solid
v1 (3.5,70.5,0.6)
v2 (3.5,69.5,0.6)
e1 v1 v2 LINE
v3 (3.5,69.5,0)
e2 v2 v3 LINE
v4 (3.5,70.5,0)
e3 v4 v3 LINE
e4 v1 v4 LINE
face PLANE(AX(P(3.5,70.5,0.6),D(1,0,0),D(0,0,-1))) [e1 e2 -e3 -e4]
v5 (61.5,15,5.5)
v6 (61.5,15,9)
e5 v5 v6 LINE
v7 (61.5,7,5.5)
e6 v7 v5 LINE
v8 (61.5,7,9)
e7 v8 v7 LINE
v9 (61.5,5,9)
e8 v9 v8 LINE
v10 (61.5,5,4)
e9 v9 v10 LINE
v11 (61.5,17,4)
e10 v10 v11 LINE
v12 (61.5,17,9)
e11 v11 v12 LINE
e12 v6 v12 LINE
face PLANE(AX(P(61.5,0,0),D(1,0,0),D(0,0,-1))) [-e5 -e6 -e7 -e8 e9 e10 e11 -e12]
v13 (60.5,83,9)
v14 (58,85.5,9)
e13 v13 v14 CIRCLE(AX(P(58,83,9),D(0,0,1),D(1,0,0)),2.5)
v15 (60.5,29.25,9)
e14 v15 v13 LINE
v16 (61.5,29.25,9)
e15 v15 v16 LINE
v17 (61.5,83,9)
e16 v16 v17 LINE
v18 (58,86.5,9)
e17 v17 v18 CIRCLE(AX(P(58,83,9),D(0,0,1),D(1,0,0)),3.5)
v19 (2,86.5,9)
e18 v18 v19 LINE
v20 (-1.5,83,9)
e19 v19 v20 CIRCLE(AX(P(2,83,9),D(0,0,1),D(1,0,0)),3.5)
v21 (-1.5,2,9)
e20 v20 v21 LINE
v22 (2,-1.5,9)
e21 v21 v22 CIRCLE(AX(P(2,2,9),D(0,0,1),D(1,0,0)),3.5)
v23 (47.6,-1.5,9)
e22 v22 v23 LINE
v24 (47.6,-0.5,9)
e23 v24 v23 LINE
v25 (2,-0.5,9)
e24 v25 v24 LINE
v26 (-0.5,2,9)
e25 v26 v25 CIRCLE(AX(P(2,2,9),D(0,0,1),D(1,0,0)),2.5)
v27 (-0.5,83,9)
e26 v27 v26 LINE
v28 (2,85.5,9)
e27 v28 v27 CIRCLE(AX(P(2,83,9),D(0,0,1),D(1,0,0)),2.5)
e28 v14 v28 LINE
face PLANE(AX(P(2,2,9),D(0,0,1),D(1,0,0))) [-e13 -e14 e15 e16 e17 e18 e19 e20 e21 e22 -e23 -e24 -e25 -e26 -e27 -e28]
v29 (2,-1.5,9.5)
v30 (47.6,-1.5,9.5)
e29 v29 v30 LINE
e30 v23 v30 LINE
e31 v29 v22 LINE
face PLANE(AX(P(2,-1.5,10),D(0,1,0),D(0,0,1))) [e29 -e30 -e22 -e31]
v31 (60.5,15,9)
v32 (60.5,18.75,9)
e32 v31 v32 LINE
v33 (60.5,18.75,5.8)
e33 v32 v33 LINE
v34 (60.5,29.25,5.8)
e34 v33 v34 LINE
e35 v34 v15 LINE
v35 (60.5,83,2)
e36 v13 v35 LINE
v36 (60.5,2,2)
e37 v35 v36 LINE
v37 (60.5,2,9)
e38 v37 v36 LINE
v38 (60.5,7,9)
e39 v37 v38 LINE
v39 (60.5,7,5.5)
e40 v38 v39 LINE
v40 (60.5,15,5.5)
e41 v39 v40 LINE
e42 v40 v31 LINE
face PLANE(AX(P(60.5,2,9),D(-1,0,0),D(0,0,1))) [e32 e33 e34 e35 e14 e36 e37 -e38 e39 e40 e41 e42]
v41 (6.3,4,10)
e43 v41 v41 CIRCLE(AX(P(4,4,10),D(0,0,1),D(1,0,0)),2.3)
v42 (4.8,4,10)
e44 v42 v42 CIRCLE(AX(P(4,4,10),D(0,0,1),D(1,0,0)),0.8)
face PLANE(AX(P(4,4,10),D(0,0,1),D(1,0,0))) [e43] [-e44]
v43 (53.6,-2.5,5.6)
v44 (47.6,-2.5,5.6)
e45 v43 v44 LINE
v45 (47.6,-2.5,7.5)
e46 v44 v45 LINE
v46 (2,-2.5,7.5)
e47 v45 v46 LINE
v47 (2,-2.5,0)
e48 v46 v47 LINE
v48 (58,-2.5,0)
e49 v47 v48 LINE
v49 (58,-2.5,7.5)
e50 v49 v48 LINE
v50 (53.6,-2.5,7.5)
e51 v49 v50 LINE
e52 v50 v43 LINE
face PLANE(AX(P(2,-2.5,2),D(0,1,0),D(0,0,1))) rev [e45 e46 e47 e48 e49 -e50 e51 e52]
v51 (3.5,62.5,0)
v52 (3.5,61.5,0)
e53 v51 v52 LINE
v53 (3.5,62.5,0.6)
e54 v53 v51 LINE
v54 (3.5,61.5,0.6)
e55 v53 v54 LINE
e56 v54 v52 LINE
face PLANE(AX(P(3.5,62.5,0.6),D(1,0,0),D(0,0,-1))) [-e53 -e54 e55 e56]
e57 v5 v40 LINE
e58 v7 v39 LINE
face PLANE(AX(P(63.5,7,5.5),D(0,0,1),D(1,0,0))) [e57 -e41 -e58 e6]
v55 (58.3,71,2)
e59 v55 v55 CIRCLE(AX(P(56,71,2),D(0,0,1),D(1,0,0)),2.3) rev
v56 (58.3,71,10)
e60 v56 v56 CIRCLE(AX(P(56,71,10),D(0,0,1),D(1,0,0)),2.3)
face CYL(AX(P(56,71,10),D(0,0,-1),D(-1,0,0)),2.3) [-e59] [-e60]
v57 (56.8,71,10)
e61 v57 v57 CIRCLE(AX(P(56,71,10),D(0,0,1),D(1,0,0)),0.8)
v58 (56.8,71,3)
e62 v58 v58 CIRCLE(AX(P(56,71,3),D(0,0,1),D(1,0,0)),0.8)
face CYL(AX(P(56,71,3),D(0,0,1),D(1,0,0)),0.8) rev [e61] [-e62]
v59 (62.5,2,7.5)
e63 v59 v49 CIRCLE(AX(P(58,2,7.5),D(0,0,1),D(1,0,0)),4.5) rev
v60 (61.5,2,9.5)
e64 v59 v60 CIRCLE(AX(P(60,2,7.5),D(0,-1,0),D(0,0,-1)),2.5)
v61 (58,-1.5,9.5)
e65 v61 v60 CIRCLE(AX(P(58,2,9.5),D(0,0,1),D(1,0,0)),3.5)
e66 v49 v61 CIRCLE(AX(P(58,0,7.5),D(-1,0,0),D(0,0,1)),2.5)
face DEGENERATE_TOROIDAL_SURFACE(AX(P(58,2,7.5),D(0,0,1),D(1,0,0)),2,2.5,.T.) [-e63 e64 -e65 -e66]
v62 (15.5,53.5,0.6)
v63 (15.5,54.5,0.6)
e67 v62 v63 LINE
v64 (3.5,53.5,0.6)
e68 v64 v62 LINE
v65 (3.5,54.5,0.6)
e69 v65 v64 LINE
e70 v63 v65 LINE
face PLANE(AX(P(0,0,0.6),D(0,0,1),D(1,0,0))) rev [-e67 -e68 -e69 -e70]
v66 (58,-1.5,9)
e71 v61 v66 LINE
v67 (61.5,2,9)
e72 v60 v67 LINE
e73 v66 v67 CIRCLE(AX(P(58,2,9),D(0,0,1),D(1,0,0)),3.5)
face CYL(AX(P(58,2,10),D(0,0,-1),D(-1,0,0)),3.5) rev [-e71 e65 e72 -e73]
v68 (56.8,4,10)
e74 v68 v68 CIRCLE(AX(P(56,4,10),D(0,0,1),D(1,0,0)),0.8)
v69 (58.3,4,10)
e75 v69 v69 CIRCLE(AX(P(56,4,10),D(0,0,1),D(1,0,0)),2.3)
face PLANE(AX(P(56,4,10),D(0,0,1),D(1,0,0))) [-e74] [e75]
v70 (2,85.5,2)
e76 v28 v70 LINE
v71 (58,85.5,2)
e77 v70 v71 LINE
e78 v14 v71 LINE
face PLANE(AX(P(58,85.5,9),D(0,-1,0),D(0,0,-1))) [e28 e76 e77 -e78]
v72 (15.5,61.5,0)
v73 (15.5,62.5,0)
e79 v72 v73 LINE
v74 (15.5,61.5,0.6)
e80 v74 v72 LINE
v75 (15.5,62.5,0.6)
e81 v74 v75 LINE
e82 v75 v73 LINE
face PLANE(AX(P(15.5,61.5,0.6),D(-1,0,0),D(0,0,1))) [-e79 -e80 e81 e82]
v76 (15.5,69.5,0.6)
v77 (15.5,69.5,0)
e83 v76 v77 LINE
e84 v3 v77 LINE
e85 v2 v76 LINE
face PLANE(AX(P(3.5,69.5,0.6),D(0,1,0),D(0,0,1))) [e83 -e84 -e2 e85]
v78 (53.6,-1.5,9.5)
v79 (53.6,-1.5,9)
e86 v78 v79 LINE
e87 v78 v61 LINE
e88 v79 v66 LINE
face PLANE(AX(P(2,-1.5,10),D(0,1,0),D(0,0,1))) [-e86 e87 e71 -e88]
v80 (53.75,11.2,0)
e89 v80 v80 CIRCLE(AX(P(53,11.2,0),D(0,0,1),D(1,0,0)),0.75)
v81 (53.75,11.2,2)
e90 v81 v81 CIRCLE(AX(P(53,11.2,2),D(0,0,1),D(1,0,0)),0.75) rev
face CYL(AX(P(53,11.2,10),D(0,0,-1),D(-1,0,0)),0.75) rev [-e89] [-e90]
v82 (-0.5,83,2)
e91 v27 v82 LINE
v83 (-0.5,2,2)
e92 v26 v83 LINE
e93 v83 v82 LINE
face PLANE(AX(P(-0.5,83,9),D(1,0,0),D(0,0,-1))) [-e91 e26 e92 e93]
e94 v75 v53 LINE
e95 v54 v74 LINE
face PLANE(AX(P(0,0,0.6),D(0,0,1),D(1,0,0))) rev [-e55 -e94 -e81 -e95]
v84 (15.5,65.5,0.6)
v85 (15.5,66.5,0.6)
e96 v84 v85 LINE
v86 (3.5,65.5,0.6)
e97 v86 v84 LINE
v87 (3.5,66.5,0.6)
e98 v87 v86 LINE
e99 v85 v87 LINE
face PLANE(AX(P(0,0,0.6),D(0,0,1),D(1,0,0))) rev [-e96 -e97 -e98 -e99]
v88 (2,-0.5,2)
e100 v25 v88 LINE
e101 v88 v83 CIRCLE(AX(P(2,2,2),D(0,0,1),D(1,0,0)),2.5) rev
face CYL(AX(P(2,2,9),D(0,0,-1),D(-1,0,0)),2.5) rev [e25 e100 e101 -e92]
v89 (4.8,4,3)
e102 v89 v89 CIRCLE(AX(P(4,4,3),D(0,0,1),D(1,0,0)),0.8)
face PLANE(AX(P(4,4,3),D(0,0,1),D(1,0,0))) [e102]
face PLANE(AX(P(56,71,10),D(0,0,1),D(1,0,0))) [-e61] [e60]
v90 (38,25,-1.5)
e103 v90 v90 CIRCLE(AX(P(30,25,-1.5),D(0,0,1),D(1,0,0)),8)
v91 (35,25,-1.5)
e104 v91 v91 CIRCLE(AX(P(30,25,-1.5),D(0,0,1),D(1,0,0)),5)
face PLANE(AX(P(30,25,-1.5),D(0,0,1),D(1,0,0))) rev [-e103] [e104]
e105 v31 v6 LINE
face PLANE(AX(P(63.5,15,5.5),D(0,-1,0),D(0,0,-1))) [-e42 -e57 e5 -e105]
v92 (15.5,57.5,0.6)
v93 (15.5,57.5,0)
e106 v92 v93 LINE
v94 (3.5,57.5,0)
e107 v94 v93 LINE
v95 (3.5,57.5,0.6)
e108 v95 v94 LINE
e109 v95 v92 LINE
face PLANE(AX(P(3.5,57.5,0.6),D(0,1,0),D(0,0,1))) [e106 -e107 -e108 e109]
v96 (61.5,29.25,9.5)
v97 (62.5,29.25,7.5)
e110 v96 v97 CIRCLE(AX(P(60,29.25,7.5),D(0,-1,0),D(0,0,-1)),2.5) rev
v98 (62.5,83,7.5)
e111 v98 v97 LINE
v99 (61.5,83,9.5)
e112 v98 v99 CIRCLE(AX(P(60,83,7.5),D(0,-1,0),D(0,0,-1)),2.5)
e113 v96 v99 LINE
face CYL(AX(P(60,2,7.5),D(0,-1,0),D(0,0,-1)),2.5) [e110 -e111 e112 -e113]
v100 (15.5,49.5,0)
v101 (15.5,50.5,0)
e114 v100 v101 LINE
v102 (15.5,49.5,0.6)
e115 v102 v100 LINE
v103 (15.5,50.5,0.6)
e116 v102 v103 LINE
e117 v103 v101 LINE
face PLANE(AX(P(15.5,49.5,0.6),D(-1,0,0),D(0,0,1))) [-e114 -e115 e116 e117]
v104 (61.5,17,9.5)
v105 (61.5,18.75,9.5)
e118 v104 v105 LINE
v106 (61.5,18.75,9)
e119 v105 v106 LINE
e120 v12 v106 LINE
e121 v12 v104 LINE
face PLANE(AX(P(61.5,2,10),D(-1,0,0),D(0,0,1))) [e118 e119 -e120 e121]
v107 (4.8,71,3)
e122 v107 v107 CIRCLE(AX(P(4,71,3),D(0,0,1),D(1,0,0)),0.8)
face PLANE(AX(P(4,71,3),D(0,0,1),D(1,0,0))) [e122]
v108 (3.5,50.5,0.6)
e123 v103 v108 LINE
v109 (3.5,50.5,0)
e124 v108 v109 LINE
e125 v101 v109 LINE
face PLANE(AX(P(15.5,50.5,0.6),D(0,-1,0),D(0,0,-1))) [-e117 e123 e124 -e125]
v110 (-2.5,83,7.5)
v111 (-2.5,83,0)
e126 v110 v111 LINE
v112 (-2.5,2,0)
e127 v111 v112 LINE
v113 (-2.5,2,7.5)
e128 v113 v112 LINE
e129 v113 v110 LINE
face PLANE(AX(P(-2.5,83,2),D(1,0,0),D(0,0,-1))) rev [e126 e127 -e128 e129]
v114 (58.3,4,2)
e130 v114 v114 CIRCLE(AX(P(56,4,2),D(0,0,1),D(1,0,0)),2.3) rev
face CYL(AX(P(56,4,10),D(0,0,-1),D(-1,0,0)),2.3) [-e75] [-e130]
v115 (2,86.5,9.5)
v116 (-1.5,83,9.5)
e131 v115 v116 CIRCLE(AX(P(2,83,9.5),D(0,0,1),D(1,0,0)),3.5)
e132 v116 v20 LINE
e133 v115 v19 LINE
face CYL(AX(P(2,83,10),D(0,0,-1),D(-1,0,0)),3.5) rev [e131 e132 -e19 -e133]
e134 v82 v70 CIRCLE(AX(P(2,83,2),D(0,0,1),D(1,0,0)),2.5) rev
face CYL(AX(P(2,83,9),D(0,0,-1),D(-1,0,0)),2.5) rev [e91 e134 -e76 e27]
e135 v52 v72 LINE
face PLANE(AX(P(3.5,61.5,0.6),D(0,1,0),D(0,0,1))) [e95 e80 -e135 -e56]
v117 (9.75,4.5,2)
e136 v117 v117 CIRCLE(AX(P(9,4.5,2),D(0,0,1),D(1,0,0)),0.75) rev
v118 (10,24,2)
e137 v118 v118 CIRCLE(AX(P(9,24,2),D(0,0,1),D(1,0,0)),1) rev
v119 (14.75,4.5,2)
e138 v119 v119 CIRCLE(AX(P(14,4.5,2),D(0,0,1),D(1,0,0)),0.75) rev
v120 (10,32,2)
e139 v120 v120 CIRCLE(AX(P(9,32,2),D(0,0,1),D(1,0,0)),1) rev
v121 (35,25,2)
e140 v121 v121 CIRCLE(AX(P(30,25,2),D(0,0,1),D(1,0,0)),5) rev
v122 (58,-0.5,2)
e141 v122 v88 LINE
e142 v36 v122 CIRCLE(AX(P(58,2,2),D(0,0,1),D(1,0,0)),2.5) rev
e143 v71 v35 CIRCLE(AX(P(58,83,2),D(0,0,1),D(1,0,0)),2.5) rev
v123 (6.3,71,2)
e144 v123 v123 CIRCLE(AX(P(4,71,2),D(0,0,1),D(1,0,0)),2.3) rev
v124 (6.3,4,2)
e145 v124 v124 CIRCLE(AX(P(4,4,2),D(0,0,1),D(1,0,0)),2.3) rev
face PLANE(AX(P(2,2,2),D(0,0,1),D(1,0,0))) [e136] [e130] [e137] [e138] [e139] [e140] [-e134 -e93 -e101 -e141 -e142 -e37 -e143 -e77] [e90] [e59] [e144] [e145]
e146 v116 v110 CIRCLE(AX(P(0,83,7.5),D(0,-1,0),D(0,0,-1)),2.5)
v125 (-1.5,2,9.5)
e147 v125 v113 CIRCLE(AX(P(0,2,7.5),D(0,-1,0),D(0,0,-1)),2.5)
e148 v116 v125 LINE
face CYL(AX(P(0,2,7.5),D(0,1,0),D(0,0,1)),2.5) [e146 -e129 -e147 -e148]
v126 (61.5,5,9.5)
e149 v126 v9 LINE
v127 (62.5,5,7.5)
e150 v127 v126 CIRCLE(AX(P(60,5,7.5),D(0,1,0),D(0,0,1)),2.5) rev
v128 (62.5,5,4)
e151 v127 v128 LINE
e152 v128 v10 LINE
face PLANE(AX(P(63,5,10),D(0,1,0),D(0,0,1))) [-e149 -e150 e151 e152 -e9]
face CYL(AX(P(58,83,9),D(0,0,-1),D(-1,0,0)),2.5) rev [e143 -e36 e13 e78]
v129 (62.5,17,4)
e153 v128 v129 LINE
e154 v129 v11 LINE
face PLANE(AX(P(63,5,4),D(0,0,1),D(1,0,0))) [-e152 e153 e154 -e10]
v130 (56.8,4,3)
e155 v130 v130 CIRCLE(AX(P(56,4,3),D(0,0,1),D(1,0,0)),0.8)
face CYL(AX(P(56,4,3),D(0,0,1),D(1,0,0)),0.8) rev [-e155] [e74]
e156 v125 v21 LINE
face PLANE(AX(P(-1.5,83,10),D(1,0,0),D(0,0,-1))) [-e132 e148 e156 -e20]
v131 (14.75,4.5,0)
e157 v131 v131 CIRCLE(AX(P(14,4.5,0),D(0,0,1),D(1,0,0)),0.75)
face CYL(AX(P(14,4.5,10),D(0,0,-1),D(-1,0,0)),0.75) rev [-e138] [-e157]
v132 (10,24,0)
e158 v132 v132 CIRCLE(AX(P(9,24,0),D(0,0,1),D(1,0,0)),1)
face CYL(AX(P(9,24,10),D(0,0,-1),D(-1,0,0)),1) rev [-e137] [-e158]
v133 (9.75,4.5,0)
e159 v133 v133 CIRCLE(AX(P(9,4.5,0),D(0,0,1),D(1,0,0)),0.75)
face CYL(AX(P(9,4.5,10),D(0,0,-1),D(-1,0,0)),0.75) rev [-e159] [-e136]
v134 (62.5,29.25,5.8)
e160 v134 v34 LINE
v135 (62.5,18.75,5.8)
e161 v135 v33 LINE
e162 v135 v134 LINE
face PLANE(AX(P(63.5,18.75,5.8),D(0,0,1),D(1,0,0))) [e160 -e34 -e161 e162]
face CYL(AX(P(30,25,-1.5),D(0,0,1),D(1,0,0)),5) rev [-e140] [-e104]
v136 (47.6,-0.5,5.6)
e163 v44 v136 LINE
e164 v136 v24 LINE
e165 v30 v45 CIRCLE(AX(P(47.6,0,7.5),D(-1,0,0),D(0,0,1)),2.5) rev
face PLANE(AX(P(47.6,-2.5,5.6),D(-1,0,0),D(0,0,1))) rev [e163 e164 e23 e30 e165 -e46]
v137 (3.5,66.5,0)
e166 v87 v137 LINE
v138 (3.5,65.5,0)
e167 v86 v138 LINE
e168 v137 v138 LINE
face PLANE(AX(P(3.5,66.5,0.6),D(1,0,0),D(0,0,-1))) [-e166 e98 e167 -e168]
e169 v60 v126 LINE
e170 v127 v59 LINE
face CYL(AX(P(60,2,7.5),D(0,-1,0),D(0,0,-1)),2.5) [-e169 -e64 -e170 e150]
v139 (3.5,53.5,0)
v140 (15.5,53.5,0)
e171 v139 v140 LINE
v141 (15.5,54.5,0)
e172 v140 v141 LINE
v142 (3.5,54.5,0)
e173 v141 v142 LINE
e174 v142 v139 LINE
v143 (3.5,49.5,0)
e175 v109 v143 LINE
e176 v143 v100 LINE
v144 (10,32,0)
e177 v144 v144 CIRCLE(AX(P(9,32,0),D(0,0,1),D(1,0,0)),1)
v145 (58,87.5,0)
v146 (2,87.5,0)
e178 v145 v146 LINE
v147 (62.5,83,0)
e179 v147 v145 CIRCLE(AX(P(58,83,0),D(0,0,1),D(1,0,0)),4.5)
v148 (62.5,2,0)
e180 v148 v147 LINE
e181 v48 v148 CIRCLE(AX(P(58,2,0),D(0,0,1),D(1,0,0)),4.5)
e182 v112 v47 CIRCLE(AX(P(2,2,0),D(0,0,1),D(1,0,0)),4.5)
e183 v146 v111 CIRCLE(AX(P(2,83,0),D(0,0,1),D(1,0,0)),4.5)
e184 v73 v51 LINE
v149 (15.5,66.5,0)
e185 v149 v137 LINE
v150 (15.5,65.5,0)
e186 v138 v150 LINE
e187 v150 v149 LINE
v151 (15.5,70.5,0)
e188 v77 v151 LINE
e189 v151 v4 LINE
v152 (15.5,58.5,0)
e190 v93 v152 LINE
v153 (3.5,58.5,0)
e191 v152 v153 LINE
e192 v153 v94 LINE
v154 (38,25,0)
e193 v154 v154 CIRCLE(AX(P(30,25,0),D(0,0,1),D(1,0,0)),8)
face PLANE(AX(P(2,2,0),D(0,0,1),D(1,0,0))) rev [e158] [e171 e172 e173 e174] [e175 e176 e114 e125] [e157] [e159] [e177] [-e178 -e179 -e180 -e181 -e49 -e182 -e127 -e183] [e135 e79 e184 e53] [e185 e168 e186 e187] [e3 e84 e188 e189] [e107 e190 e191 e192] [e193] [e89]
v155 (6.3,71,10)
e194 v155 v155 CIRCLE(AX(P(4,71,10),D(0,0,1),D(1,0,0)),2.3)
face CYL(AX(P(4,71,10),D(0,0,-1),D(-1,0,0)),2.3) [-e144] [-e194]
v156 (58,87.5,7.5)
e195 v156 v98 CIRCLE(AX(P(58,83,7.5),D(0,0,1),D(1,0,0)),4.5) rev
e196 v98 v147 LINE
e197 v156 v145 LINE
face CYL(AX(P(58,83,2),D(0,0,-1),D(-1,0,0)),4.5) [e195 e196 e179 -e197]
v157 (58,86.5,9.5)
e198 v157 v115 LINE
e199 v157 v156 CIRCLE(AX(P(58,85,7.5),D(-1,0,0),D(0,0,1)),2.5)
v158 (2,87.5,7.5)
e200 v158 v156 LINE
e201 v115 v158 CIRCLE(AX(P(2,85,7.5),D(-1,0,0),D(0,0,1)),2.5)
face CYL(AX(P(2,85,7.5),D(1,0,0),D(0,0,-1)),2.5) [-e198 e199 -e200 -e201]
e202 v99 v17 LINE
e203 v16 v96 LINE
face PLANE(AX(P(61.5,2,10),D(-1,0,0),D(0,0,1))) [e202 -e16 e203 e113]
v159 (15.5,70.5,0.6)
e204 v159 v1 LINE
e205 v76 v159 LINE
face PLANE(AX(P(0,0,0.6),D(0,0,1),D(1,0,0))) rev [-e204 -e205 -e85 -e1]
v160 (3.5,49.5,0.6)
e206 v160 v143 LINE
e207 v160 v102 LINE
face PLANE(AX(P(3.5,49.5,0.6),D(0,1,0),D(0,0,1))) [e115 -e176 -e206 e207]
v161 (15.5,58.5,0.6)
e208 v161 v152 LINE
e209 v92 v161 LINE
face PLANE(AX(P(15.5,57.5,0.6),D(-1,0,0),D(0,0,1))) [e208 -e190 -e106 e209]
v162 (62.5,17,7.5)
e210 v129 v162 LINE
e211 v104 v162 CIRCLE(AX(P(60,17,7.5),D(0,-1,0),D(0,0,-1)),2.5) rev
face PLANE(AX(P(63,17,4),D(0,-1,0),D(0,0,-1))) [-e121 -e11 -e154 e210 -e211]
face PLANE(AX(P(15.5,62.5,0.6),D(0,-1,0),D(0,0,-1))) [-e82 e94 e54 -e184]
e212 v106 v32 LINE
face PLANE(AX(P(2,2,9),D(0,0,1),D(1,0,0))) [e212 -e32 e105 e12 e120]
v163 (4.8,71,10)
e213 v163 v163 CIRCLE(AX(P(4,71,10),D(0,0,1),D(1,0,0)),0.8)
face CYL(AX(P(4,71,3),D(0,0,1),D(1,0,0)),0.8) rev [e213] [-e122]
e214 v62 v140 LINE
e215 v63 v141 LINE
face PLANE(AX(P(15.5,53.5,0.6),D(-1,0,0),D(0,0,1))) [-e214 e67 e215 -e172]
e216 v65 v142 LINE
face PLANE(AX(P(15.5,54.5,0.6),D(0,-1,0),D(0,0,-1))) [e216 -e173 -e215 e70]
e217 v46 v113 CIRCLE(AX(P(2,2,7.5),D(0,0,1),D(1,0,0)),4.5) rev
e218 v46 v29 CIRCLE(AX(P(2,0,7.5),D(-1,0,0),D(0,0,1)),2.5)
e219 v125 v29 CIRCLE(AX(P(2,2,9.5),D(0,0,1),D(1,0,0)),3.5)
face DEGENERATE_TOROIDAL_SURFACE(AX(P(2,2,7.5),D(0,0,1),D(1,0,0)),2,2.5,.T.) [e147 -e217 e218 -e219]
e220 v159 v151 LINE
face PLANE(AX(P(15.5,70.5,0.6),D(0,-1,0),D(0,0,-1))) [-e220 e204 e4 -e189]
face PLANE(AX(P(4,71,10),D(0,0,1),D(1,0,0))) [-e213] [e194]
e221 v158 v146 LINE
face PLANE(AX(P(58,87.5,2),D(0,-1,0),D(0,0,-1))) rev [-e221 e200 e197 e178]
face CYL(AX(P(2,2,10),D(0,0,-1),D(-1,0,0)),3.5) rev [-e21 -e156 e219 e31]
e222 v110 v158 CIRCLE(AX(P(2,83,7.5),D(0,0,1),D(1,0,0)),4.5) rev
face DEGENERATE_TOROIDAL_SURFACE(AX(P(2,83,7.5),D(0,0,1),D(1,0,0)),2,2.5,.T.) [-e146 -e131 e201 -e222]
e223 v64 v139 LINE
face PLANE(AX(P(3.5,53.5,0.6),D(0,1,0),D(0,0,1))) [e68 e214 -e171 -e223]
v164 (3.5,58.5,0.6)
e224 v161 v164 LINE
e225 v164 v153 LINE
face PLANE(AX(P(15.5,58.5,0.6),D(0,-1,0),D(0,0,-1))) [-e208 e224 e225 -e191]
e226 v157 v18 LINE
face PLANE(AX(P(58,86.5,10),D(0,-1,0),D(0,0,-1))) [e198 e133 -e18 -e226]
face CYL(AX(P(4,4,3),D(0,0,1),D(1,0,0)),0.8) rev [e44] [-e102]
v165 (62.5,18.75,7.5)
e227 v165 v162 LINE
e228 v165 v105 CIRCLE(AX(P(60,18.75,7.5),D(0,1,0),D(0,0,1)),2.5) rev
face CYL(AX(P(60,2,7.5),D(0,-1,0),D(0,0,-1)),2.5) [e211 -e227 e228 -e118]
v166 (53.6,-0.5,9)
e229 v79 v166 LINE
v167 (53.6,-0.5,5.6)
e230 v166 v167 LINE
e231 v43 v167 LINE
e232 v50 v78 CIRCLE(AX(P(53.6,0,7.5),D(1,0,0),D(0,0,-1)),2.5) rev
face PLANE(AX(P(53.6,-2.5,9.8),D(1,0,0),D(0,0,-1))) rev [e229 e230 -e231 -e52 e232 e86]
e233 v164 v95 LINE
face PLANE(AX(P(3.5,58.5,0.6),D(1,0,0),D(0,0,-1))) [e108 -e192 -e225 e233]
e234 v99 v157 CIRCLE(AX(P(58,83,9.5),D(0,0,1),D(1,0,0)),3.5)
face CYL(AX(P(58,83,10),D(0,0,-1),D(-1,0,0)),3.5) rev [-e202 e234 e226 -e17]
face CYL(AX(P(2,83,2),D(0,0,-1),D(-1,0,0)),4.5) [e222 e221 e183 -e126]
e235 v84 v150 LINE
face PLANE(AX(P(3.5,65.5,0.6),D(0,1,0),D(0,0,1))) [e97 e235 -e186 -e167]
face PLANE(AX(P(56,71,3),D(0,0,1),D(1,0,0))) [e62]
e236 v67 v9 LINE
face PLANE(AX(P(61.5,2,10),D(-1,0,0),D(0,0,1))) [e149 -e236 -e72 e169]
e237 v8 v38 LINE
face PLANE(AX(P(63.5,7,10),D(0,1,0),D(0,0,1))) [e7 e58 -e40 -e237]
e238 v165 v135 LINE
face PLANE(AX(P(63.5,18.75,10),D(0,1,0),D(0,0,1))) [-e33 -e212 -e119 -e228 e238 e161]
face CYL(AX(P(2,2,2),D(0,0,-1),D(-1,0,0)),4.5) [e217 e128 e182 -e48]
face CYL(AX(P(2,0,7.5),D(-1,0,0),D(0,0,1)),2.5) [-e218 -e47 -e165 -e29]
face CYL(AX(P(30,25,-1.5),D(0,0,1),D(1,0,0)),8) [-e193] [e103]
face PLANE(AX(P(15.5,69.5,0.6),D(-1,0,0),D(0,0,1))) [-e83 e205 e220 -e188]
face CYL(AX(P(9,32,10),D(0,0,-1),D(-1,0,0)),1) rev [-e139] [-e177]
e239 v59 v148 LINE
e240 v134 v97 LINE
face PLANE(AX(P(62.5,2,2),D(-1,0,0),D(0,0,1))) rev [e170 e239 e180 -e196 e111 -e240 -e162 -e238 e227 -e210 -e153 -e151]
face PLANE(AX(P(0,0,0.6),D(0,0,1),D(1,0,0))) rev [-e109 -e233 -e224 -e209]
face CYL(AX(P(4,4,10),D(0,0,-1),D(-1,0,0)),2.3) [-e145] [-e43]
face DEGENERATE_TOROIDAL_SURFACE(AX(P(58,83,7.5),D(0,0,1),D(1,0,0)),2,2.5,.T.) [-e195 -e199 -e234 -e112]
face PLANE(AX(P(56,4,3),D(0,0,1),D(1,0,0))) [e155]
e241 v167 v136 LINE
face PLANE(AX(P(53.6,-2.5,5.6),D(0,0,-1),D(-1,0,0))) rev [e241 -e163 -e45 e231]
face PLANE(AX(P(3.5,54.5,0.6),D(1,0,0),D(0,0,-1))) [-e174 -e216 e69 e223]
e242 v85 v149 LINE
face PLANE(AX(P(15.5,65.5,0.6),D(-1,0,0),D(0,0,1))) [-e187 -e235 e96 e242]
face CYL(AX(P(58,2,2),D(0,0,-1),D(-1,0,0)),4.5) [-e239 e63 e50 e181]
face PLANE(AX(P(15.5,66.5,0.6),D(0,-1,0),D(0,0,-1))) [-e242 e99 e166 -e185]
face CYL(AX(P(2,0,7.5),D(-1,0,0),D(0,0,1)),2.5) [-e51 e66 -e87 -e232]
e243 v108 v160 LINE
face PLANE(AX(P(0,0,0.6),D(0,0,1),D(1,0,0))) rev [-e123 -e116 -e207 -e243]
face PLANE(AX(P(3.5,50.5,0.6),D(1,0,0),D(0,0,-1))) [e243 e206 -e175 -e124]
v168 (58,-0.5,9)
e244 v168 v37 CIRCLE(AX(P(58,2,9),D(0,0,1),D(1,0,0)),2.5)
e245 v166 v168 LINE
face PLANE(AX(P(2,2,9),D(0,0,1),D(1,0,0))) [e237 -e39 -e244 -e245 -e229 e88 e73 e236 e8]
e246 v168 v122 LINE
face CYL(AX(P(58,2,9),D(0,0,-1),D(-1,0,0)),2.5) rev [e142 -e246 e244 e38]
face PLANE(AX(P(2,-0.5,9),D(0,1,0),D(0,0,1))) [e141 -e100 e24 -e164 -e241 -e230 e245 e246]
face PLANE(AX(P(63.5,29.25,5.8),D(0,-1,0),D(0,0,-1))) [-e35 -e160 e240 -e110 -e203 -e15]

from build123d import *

# Parameters (mm, degrees)
TOP_PLATE_DEPTH                = 2
WALL_OUTER_HALF_DEPTH          = 10
WALL_INNER_HALF_DEPTH          = 9
LENS_FACE_ROUND_OVER_R         = 2.5
SKETCH_4_R                     = 8
SKETCH_4_R_2                   = 5
LENS_BEZEL_RING_DEPTH          = 1.5
SKETCH_5_R                     = 2.3
CORNER_POSTS_DEPTH             = 10
POST_START                     = 10
SKETCH_6_R                     = 0.8
POST_PILOT_HOLES_M2_DEPTH      = 7
SKETCH_7_W                     = 12
SKETCH_7_H                     = 1
GRIP_GROOVES_DEPTH             = 0.6
SKETCH_8_R                     = 1
BOOT_RESET_PINHOLES_DEPTH      = 108.993055471
SKETCH_9_W                     = 6
SKETCH_9_H                     = 4.2
SHUTTER_WINDOW_DEPTH           = 108.993055471
SKETCH_10_R                    = 5
LENS_HOLE_DEPTH                = 108.993055471
SKETCH_11_R                    = 0.75
LED_LIGHT_HOLES_D1_D4_D5_DEPTH = 108.993055471
USB_C_START                    = 59
SKETCH_12_W                    = 4.2
SKETCH_12_H                    = 10.5
USB_C_WINDOW_DEPTH             = 4.5
POWER_START                    = 59
SKETCH_13_W                    = 4.5
SKETCH_13_H                    = 8
POWER_SWITCH_SLOT_DEPTH        = 4.5
SWITCH_START                   = 61.5
SKETCH_14_W                    = 6
SKETCH_14_H                    = 12
SWITCH_FINGER_POCKET_DEPTH     = 1.5


with BuildPart() as part:
    # 草圖1 → top plate (new body)
    with BuildSketch(Plane.XY):
        with BuildLine():
            Line((2, -2.5), (58, -2.5))
            ThreePointArc((58, -2.5), (61.181980515, -1.181980515), (62.5, 2))
            Line((62.5, 2), (62.5, 83))
            ThreePointArc((62.5, 83), (61.181980515, 86.181980515), (58, 87.5))
            Line((58, 87.5), (2, 87.5))
            ThreePointArc((2, 87.5), (-1.181980515, 86.181980515), (-2.5, 83))
            Line((-2.5, 83), (-2.5, 2))
            ThreePointArc((-2.5, 2), (-1.181980515, -1.181980515), (2, -2.5))
        make_face()
    extrude(amount=TOP_PLATE_DEPTH)

    # 草圖2 → wall outer half (add)
    with BuildSketch(Plane.XY):
        with BuildLine():
            Line((2, -2.5), (58, -2.5))
            ThreePointArc((58, -2.5), (61.181980515, -1.181980515), (62.5, 2))
            Line((62.5, 2), (62.5, 83))
            ThreePointArc((62.5, 83), (61.181980515, 86.181980515), (58, 87.5))
            Line((58, 87.5), (2, 87.5))
            ThreePointArc((2, 87.5), (-1.181980515, 86.181980515), (-2.5, 83))
            Line((-2.5, 83), (-2.5, 2))
            ThreePointArc((-2.5, 2), (-1.181980515, -1.181980515), (2, -2.5))
        make_face()
        with BuildLine():
            Line((2, -1.5), (58, -1.5))
            ThreePointArc((58, -1.5), (60.474873734, -0.474873734), (61.5, 2))
            Line((61.5, 2), (61.5, 83))
            ThreePointArc((61.5, 83), (60.474873734, 85.474873734), (58, 86.5))
            Line((58, 86.5), (2, 86.5))
            ThreePointArc((2, 86.5), (-0.474873734, 85.474873734), (-1.5, 83))
            Line((-1.5, 83), (-1.5, 2))
            ThreePointArc((-1.5, 2), (-0.474873734, -0.474873734), (2, -1.5))
        make_face(mode=Mode.SUBTRACT)
    extrude(amount=WALL_OUTER_HALF_DEPTH)

    # 草圖3 → wall inner half (add)
    with BuildSketch(Plane.XY):
        with BuildLine():
            Line((2, -1.5), (58, -1.5))
            ThreePointArc((58, -1.5), (60.474873734, -0.474873734), (61.5, 2))
            Line((61.5, 2), (61.5, 83))
            ThreePointArc((61.5, 83), (60.474873734, 85.474873734), (58, 86.5))
            Line((58, 86.5), (2, 86.5))
            ThreePointArc((2, 86.5), (-0.474873734, 85.474873734), (-1.5, 83))
            Line((-1.5, 83), (-1.5, 2))
            ThreePointArc((-1.5, 2), (-0.474873734, -0.474873734), (2, -1.5))
        make_face()
        with BuildLine():
            Line((2, -0.5), (58, -0.5))
            ThreePointArc((58, -0.5), (59.767766953, 0.232233047), (60.5, 2))
            Line((60.5, 2), (60.5, 83))
            ThreePointArc((60.5, 83), (59.767766953, 84.767766953), (58, 85.5))
            Line((58, 85.5), (2, 85.5))
            ThreePointArc((2, 85.5), (0.232233047, 84.767766953), (-0.5, 83))
            Line((-0.5, 83), (-0.5, 2))
            ThreePointArc((-0.5, 2), (0.232233047, 0.232233047), (2, -0.5))
        make_face(mode=Mode.SUBTRACT)
    extrude(amount=WALL_INNER_HALF_DEPTH)

    # lens face round-over
    # the kernel refuses this fillet: 2.5 mm, written as the material it takes off along each edge
    with BuildSketch(Plane(origin=(2, 2, 10), x_dir=(-1, 0, 0), z_dir=(0, 1, 0))) as lens_face_round_over_piece_1:
        with BuildLine():
            CenterArc((4.5 - LENS_FACE_ROUND_OVER_R, -LENS_FACE_ROUND_OVER_R), LENS_FACE_ROUND_OVER_R, 0, 90)
            Line((4.5 - LENS_FACE_ROUND_OVER_R, 0), (4.5, 0))
            Line((4.5, 0), (4.5, -LENS_FACE_ROUND_OVER_R))
        make_face()
    revolve(axis=Axis((2, 2, 10), (0, 0, 1)), revolution_arc=90, mode=Mode.SUBTRACT)
    with BuildSketch(Plane(origin=(-2.5, 83, 10), x_dir=(1, 0, 0), z_dir=(0, -1, 0)), Plane(origin=(62.5, 2, 10), x_dir=(-1, 0, 0), z_dir=(0, 1, 0))) as lens_face_round_over_piece_2:
        with BuildLine():
            CenterArc((LENS_FACE_ROUND_OVER_R, -LENS_FACE_ROUND_OVER_R), LENS_FACE_ROUND_OVER_R, 90, 90)
            Line((0, -LENS_FACE_ROUND_OVER_R), (0, 0))
            Line((0, 0), (LENS_FACE_ROUND_OVER_R, 0))
        make_face()
    extrude(amount=81, mode=Mode.SUBTRACT)
    with BuildSketch(Plane(origin=(2, 83, 10), x_dir=(0, 1, 0), z_dir=(1, 0, 0))) as lens_face_round_over_piece_3:
        with BuildLine():
            CenterArc((4.5 - LENS_FACE_ROUND_OVER_R, -LENS_FACE_ROUND_OVER_R), LENS_FACE_ROUND_OVER_R, 0, 90)
            Line((4.5, -LENS_FACE_ROUND_OVER_R), (4.5, 0))
            Line((4.5, 0), (4.5 - LENS_FACE_ROUND_OVER_R, 0))
        make_face()
    revolve(axis=Axis((2, 83, 10), (0, 0, 1)), revolution_arc=90, mode=Mode.SUBTRACT)
    with BuildSketch(Plane(origin=(58, 87.5, 10), x_dir=(0, -1, 0), z_dir=(-1, 0, 0))) as lens_face_round_over_piece_4:
        with BuildLine():
            CenterArc((LENS_FACE_ROUND_OVER_R, -LENS_FACE_ROUND_OVER_R), LENS_FACE_ROUND_OVER_R, 90, 90)
            Line((0, -LENS_FACE_ROUND_OVER_R), (0, 0))
            Line((0, 0), (LENS_FACE_ROUND_OVER_R, 0))
        make_face()
    extrude(amount=56, mode=Mode.SUBTRACT)
    with BuildSketch(Plane(origin=(58, 83, 10), x_dir=(1, 0, 0), z_dir=(0, -1, 0))) as lens_face_round_over_piece_5:
        with BuildLine():
            CenterArc((4.5 - LENS_FACE_ROUND_OVER_R, -LENS_FACE_ROUND_OVER_R), LENS_FACE_ROUND_OVER_R, 0, 90)
            Line((4.5, -LENS_FACE_ROUND_OVER_R), (4.5, 0))
            Line((4.5, 0), (4.5 - LENS_FACE_ROUND_OVER_R, 0))
        make_face()
    revolve(axis=Axis((58, 83, 10), (0, 0, 1)), revolution_arc=90, mode=Mode.SUBTRACT)
    with BuildSketch(Plane(origin=(58, 2, 10), x_dir=(0, -1, 0), z_dir=(-1, 0, 0))) as lens_face_round_over_piece_6:
        with BuildLine():
            CenterArc((4.5 - LENS_FACE_ROUND_OVER_R, -LENS_FACE_ROUND_OVER_R), LENS_FACE_ROUND_OVER_R, 0, 90)
            Line((4.5, -LENS_FACE_ROUND_OVER_R), (4.5, 0))
            Line((4.5, 0), (4.5 - LENS_FACE_ROUND_OVER_R, 0))
        make_face()
    revolve(axis=Axis((58, 2, 10), (0, 0, 1)), revolution_arc=90, mode=Mode.SUBTRACT)
    with BuildSketch(Plane(origin=(2, -2.5, 10), x_dir=(0, 0, -1), z_dir=(1, 0, 0))) as lens_face_round_over_piece_7:
        with BuildLine():
            CenterArc((LENS_FACE_ROUND_OVER_R, LENS_FACE_ROUND_OVER_R), LENS_FACE_ROUND_OVER_R, 180, 90)
            Line((0, LENS_FACE_ROUND_OVER_R), (0, 0))
            Line((0, 0), (LENS_FACE_ROUND_OVER_R, 0))
        make_face()
    extrude(amount=56, mode=Mode.SUBTRACT)

    # 草圖4 → lens bezel ring (add)
    with BuildSketch(Plane.XY):
        with Locations((30, 25)):
            Circle(SKETCH_4_R)
        with Locations((30, 25)):
            Circle(SKETCH_4_R_2, mode=Mode.SUBTRACT)
    extrude(amount=-LENS_BEZEL_RING_DEPTH)

    # 草圖5 → corner posts (add)
    with BuildSketch(Plane.XY):
        with Locations((4, 4)):
            Circle(SKETCH_5_R)
        with Locations((56, 4)):
            Circle(SKETCH_5_R)
        with Locations((4, 71)):
            Circle(SKETCH_5_R)
        with Locations((56, 71)):
            Circle(SKETCH_5_R)
    extrude(amount=CORNER_POSTS_DEPTH)

    # 草圖6 → post pilot holes M2 (cut)
    with BuildSketch(Plane.XY.offset(POST_START)):
        with Locations((4, 4)):
            Circle(SKETCH_6_R)
        with Locations((56, 4)):
            Circle(SKETCH_6_R)
        with Locations((4, 71)):
            Circle(SKETCH_6_R)
        with Locations((56, 71)):
            Circle(SKETCH_6_R)
    extrude(amount=-POST_PILOT_HOLES_M2_DEPTH, mode=Mode.SUBTRACT)

    # 草圖7 → grip grooves (cut)
    with BuildSketch(Plane.XY):
        with Locations((9.5, 50)):
            Rectangle(SKETCH_7_W, SKETCH_7_H)
        with Locations((9.5, 54)):
            Rectangle(SKETCH_7_W, SKETCH_7_H)
        with Locations((9.5, 58)):
            Rectangle(SKETCH_7_W, SKETCH_7_H)
        with Locations((9.5, 62)):
            Rectangle(SKETCH_7_W, SKETCH_7_H)
        with Locations((9.5, 66)):
            Rectangle(SKETCH_7_W, SKETCH_7_H)
        with Locations((9.5, 70)):
            Rectangle(SKETCH_7_W, SKETCH_7_H)
    extrude(amount=GRIP_GROOVES_DEPTH, mode=Mode.SUBTRACT)

    # 草圖8 → BOOT/RESET pinholes (cut, through all)
    with BuildSketch(Plane.XY):
        with Locations((9, 24)):
            Circle(SKETCH_8_R)
        with Locations((9, 32)):
            Circle(SKETCH_8_R)
    extrude(amount=BOOT_RESET_PINHOLES_DEPTH, mode=Mode.SUBTRACT)

    # 草圖9 → shutter window (cut, through all)
    with BuildSketch(Plane(origin=(0, 0, 0), x_dir=(1, 0, 0), z_dir=(0, 1, 0))):
        with Locations((50.6, -7.7)):
            Rectangle(SKETCH_9_W, SKETCH_9_H)
    extrude(amount=-SHUTTER_WINDOW_DEPTH, mode=Mode.SUBTRACT)

    # 草圖10 → lens hole (cut, through all)
    with BuildSketch(Plane.XY):
        with Locations((30, 25)):
            Circle(SKETCH_10_R)
    extrude(amount=LENS_HOLE_DEPTH, mode=Mode.SUBTRACT)

    # 草圖11 → LED light holes D1 D4 D5 (cut, through all)
    with BuildSketch(Plane.XY):
        with Locations((14, 4.5)):
            Circle(SKETCH_11_R)
        with Locations((9, 4.5)):
            Circle(SKETCH_11_R)
        with Locations((53, 11.2)):
            Circle(SKETCH_11_R)
    extrude(amount=LED_LIGHT_HOLES_D1_D4_D5_DEPTH, mode=Mode.SUBTRACT)

    # 草圖12 → USB-C window (cut)
    with BuildSketch(Plane(origin=(0, 0, 0), x_dir=(0, 0, -1), z_dir=(1, 0, 0)).offset(USB_C_START)):
        with Locations((-7.9, 24)):
            Rectangle(SKETCH_12_W, SKETCH_12_H)
    extrude(amount=USB_C_WINDOW_DEPTH, mode=Mode.SUBTRACT)

    # 草圖13 → power switch slot (cut)
    with BuildSketch(Plane(origin=(0, 0, 0), x_dir=(0, 0, -1), z_dir=(1, 0, 0)).offset(POWER_START)):
        with Locations((-7.75, 11)):
            Rectangle(SKETCH_13_W, SKETCH_13_H)
    extrude(amount=POWER_SWITCH_SLOT_DEPTH, mode=Mode.SUBTRACT)

    # 草圖14 → switch finger pocket (cut)
    with BuildSketch(Plane(origin=(0, 0, 0), x_dir=(0, 0, -1), z_dir=(1, 0, 0)).offset(SWITCH_START)):
        with Locations((-7, 11)):
            Rectangle(SKETCH_14_W, SKETCH_14_H)
    extrude(amount=SWITCH_FINGER_POCKET_DEPTH, mode=Mode.SUBTRACT)


solid = part.part
